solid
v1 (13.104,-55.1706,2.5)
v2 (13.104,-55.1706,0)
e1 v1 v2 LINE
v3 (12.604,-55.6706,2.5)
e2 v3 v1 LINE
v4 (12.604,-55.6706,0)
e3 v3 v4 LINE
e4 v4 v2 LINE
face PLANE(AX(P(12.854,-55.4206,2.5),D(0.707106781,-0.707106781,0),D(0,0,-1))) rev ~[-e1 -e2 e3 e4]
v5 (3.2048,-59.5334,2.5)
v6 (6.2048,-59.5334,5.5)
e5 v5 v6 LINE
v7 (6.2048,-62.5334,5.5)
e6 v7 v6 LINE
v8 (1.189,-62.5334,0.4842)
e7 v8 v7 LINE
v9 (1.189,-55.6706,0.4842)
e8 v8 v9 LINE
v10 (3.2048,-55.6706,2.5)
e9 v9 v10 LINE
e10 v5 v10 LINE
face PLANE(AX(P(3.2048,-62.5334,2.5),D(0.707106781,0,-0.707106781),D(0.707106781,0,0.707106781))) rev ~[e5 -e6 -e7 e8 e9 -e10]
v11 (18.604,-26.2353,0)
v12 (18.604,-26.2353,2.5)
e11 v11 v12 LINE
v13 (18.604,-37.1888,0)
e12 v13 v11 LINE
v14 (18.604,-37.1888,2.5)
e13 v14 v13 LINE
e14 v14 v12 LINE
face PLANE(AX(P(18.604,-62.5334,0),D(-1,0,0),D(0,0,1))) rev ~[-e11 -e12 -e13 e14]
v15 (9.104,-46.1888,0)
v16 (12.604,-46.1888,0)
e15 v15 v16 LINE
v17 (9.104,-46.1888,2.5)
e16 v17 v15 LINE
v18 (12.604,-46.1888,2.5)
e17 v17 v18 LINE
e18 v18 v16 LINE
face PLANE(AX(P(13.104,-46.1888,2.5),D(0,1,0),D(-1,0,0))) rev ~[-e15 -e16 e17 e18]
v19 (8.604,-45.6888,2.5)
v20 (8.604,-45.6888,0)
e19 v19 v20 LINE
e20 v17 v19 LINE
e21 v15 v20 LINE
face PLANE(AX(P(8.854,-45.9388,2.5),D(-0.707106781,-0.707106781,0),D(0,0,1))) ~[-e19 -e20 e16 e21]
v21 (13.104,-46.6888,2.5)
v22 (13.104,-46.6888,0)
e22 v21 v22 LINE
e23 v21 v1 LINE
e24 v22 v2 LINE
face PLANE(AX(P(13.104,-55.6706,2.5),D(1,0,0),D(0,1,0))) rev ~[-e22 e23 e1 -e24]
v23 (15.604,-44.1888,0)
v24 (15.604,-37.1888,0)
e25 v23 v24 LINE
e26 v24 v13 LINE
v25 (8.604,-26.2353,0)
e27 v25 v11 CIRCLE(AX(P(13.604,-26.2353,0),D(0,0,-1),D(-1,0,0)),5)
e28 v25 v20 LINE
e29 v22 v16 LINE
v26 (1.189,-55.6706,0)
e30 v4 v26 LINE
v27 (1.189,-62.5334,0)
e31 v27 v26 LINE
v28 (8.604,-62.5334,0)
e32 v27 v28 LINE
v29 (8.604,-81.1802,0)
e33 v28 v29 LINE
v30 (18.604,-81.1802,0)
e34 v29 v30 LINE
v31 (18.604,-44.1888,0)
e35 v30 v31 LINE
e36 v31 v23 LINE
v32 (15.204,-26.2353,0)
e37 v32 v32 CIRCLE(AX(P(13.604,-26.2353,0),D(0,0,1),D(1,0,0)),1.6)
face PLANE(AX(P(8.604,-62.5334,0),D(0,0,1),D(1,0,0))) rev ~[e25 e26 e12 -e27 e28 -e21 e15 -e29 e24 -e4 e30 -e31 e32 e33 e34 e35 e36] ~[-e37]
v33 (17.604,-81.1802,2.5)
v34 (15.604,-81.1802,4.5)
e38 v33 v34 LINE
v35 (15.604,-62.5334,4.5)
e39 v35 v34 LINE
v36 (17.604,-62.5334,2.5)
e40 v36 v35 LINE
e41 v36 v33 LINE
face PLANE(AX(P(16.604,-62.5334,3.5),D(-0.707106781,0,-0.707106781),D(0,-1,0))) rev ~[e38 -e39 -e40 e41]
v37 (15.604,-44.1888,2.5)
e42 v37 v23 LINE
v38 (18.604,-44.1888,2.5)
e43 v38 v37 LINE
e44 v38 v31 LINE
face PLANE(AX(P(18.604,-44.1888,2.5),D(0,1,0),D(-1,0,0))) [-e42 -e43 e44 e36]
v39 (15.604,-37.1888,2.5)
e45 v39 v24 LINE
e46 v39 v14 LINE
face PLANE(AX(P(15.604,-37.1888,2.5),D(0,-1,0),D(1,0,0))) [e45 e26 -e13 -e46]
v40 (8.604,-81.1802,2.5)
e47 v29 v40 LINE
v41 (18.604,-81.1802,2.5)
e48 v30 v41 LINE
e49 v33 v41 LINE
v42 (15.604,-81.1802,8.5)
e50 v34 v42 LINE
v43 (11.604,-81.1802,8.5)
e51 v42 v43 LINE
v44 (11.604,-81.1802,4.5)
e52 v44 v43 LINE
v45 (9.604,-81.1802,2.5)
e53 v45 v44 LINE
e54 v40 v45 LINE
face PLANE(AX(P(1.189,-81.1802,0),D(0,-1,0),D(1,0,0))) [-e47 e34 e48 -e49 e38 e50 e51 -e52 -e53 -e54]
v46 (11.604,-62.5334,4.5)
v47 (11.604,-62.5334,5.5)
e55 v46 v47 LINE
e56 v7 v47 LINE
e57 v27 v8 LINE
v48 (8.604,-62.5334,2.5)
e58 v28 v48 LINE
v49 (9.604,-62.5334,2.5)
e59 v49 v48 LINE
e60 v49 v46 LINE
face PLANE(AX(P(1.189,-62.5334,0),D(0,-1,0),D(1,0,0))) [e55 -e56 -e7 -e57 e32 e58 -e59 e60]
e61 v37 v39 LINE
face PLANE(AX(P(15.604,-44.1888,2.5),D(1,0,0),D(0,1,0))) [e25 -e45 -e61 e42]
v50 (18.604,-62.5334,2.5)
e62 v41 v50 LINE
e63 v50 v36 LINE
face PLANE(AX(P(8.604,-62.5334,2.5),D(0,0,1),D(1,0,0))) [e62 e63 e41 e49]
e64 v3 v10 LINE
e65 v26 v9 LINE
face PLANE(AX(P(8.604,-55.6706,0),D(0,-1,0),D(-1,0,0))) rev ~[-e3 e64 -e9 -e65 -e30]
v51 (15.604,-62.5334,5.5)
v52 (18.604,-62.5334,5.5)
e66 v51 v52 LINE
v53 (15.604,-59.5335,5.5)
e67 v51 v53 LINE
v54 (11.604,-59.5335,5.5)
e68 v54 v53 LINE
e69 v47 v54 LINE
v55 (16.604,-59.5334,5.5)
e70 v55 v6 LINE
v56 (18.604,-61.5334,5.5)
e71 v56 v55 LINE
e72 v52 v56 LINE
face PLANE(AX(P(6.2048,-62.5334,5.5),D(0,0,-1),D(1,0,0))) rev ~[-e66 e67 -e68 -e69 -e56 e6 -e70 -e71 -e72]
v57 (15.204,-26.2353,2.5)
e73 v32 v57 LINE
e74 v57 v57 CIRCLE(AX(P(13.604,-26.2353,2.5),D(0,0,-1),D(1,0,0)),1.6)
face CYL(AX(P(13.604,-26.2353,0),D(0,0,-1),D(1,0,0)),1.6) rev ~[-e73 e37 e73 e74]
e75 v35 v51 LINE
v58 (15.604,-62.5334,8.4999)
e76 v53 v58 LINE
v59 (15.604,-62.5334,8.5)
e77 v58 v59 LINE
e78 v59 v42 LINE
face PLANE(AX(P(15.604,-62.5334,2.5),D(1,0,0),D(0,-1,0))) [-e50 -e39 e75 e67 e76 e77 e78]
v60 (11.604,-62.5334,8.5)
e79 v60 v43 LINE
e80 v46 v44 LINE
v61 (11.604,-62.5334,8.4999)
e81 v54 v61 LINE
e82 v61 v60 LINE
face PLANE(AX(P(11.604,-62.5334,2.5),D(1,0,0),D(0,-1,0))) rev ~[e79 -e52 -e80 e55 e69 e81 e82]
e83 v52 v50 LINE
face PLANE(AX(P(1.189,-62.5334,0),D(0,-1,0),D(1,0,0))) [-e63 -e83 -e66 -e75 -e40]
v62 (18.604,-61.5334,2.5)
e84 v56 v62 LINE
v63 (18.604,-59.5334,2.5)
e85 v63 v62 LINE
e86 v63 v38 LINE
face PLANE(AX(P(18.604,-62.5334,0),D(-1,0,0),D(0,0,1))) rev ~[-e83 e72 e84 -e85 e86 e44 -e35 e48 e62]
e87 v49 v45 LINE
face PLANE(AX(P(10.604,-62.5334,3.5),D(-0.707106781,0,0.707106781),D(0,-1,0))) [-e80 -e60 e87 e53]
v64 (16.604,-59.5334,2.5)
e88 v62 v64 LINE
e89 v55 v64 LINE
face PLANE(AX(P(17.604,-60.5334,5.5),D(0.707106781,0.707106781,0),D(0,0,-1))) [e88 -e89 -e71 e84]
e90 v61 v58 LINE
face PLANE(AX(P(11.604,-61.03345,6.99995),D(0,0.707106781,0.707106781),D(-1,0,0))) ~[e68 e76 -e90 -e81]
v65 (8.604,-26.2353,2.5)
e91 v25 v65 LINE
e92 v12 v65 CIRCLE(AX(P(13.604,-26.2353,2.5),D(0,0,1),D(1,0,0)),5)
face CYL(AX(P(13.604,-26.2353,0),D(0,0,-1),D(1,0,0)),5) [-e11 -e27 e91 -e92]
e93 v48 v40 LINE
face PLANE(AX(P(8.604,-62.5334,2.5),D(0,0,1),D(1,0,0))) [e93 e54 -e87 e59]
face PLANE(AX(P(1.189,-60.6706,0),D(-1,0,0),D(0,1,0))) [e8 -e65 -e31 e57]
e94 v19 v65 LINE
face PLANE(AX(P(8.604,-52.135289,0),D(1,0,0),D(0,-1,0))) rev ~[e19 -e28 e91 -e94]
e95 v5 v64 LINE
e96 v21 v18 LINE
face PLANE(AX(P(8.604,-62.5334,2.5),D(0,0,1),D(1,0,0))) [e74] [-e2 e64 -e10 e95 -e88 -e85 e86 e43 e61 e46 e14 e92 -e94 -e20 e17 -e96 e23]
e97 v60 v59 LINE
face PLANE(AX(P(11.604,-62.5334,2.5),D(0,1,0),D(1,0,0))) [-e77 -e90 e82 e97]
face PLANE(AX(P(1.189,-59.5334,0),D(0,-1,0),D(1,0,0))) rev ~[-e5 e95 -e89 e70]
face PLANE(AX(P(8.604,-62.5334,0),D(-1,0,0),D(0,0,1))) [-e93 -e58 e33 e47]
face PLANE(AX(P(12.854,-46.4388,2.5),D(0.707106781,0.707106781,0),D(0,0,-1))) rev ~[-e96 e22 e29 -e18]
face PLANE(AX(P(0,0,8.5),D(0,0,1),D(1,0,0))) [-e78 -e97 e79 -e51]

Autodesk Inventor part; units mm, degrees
ref_plane "YZ Plane" through (0, 0, 0) normal (1, 0, 0) x (0, 1, 0)
ref_plane "XZ Plane" through (0, 0, 0) normal (0, 1, 0) x (-1, 0, 0)
sketch "Sketch1" plane through (0, 0, 0) normal (0, 0, 1) x (1, 0, 0)
  line L0 (8.404, 3) -> (8.404, -46.6888) projected
  line L1 (6.389, 0.2) -> (6.389, -55.1706) projected
  line L2 (7.404, -64.4706) -> (6.389, -64.4706) projected
  line L3 (6.389, -64.4706) -> (6.389, -78.3802) projected
  line L4 (-3.1786, -78.3802) -> (6.389, -78.3802) projected
  line L5 (-3.1786, -78.3802) -> (-3.1786, -81.1802) projected
  line L6 (8.404, -81.1802) -> (-3.1786, -81.1802) projected
  line L7 (8.404, -65.4706) -> (8.404, -81.1802) projected
  line L8 (8.604, -55.6706) -> (6.189, -55.6706)
  line L9 (6.189, -55.6706) -> (6.189, 0)
  line L10 (6.189, 0) -> (-3.3786, 0)
  line L11 (-3.3786, 0) -> (-3.3786, 3.2)
  line L12 (-3.3786, 3.2) -> (8.604, 3.2)
  line L13 (8.604, 3.2) -> (8.604, -55.6706)
  line L14 (8.604, -81.3802) -> (-3.3786, -81.3802)
  line L15 (-3.3786, -81.3802) -> (-3.3786, -78.1802)
  line L16 (-3.3786, -78.1802) -> (6.189, -78.1802)
  line L17 (6.189, -78.1802) -> (6.189, -64.2706)
  line L18 (6.189, -64.2706) -> (8.604, -64.2706)
  line L19 (8.604, -64.2706) -> (8.604, -81.3802)
  line L20 (13.604, -60.6706) -> (1.189, -60.6706)
  line L21 (1.189, -60.6706) -> (1.189, -5)
  line L22 (1.189, -5) -> (-8.3786, -5)
  line L23 (-8.3786, -5) -> (-8.3786, 8.2)
  line L24 (-8.3786, 8.2) -> (13.604, 8.2)
  line L25 (13.604, 8.2) -> (13.604, -60.6706)
  circle A0 centre (13.604, -26.2353) radius 5
  line L26 (18.604, -65.6706) -> (-3.811, -65.6706)
  line L27 (-3.811, -65.6706) -> (-3.811, -10)
  line L28 (-3.811, -10) -> (-13.3786, -10)
  line L29 (-13.3786, -10) -> (-13.3786, 13.2)
  line L30 (-13.3786, 13.2) -> (18.604, 13.2)
  line L31 (18.604, 13.2) -> (18.604, -65.6706)
  circle A1 centre (13.604, -26.2353) radius 1.6
  circle A2 centre (13.604, -26.2353) radius 30.3549
  circle A3 centre (13.604, -26.2353) radius 38.3626
  line L32 (8.604, -55.6706) -> (8.604, -56.1756)
  line L33 (6.189, -64.2706) -> (6.189, -63.8744)
  line L34 (6.189, -63.8744) -> (18.604, -63.8744)
  line L35 (6.189, -63.8744) -> (18.604, -63.8744) construction
  line L36 (8.604, -55.6706) -> (1.189, -55.6706)
  line L37 (1.189, -55.6706) -> (1.189, -63.8744)
  line L38 (1.189, -63.8744) -> (18.604, -63.8744)
  line L39 (1.189, -62.5334) -> (18.604, -62.5334)
  line L40 (1.189, -62.5334) -> (18.604, -62.5334) construction
  line L41 (6.389, -55.1706) -> (12.3969, -55.1706) projected
  line L42 (12.604, -54.9635) -> (12.3969, -55.1706) projected
  line L43 (12.604, -46.8959) -> (12.604, -54.9635) projected
  line L44 (12.3969, -46.6888) -> (12.604, -46.8959) projected
  line L45 (8.404, -46.6888) -> (12.3969, -46.6888) projected
  line L46 (-3.1786, 3) -> (8.404, 3) projected
  line L47 (-3.1786, 0.2) -> (-3.1786, 3) projected
  line L48 (-3.1786, 0.2) -> (6.389, 0.2) projected
  circle A4 centre (9.4965, -50.9297) radius 1.5 projected
  line L49 (7.404, -64.4706) -> (8.404, -65.4706) projected
  point P0 (0, 0)
  point P1 (8.604, -26.2353)
  point P2 (18.604, -26.2353)
  dimension "d0" = 0.2
  dimension "d1" = 0.2
  dimension "d2" = 5
  dimension "d3" = 5
  dimension "d4" = 3.2
  dimension "d5" = 0
  dimension "d6" = 0
extrude "Extrusion1" add sketch "Sketch1" along normal blind 2.5 contours L45 L44 L43 L42 L41 L13 A4 | L13 A0 L25 A2 L32 L41 L42 L43 L44 L45 | A0 L25 A1 | A4 L13 | A0 L25 A1 | A0 L31 A2 L25 | A2 L31 L39 L37 L20 L25 | L25 L20 L21 L36 A2 | L8 L32 A2 picked at (9.3865, -50.8083) picked at (16.7555, -47.8971)
sketch "Sketch2" plane through (1.189, -62.5334, 0) normal (0, -1, 0) x (1, 0, 0)
  line L0 (-0.8528, -0.0858) -> (2.6827, 3.4497) projected
  line L1 (-0.7114, -0.2272) -> (2.8241, 3.3083)
  line L2 (0, 2.5) -> (17.415, 2.5) projected
  line L3 (0, 0) -> (0, 2.5) projected
  point P0 (-1.189, 0)
  point P1 (0, 0.4842)
  point P2 (2.0158, 2.5)
  dimension "d9" = 0.2
extrude "Extrusion2" cut sketch "Sketch2" against normal through all
sketch "Sketch4" plane through (1.189, -62.5334, 0) normal (0, -1, 0) x (1, 0, 0)
  line L0 (2.0158, 2.5) -> (17.415, 2.5) projected
  line L1 (0, 0) -> (17.415, 0) projected
  line L2 (17.415, 0) -> (17.415, 2.5) projected
  line L3 (7.415, 0) -> (7.415, 2.5) projected
  point P0 (-1.189, 0)
ref_plane "Work Plane1" through (-8.1491, -81.1802, -17.0906) normal (0, -1, 0) x (0.7071068, 0, 0.7071068)
extrude "Extrusion3" add sketch "Sketch4" along normal up to surface (18.6468 mm away)
sketch "Sketch5" plane through (0, 0, 2.5) normal (0, 0, 1) x (1, 0, 0)
  line L0 (8.604, -26.2353) -> (8.604, -55.6706) projected
  circle A0 centre (13.604, -26.2353) radius 1.6 projected
  circle A1 centre (13.604, -26.2353) radius 29.857
  line L1 (8.604, -26.2353) -> (8.604, -55.6706) projected
  line L2 (8.604, -55.6706) -> (12.604, -55.6706)
  line L3 (8.604, -55.6706) -> (12.604, -55.6706) construction
  line L4 (12.604, -55.6706) -> (8.604, -55.6706)
  line L5 (8.604, -55.6706) -> (8.604, -51.6706)
  line L6 (8.604, -51.6706) -> (12.604, -51.6706)
  line L7 (12.604, -51.6706) -> (12.604, -55.6706)
  line L8 (12.604, -51.6706) -> (8.604, -51.6706)
  line L9 (8.604, -51.6706) -> (8.604, -47.6706)
  line L10 (8.604, -47.6706) -> (12.604, -47.6706)
  line L11 (12.604, -47.6706) -> (12.604, -51.6706)
  line L12 (12.604, -47.6706) -> (8.604, -47.6706)
  line L13 (8.604, -47.6706) -> (8.604, -46.6706)
  line L14 (8.604, -46.6706) -> (12.604, -46.6706)
  line L15 (12.604, -46.6706) -> (12.604, -47.6706)
  circle A2 centre (13.604, -26.2353) radius 20.4598
  circle A3 centre (13.604, -26.2353) radius 19.9598
  line L16 (12.604, -55.6706) -> (13.104, -55.6706)
  line L17 (13.104, -55.6706) -> (13.104, -46.1888)
  line L18 (13.104, -46.1888) -> (8.604, -46.1888)
  point P0 (0, 0)
  dimension "d22" = 0.5
  dimension "d14" = 4
  dimension "d15" = 0
  dimension "d16" = 4
  dimension "d17" = 4
  dimension "d18" = 4
  dimension "d19" = 4
  dimension "d20" = 4
  dimension "d21" = 1
  dimension "d23" = 0.5
  dimension "d24" = 90
  dimension "d25" = 90
extrude "Extrusion4" cut sketch "Sketch5" against normal blind 10 contours L18 A2 L14 L0 | L14 L15 L10 L0 | L18 L17 A2 | L10 L11 L6 L0 | A2 L17 L16 L7 L11 L15 | L6 L7 L2 L0
chamfer "Chamfer1" distance 0.5 angle 45 3 edges at (8.604, -46.1888, 1.25) (13.104, -46.1888, 1.25) (13.104, -55.6706, 1.25)
sketch "Sketch6" plane through (0, 0, 2.5) normal (0, 0, 1) x (1, 0, 0)
  line L0 (18.604, -26.2353) -> (18.604, -81.1802) projected
  line L1 (8.604, -62.5334) -> (8.604, -81.1802) projected
  line L2 (15.604, -26.2353) -> (15.604, -81.1802)
  line L3 (11.604, -62.5334) -> (11.604, -81.1802)
  line L4 (11.604, -62.5334) -> (15.604, -62.5334)
  line L5 (15.604, -62.5334) -> (15.604, -81.1802)
  line L6 (15.604, -81.1802) -> (11.604, -81.1802)
  line L7 (11.604, -81.1802) -> (11.604, -62.5334)
  point P0 (0, 0)
  dimension "d31" = 3
  dimension "d32" = 3
extrude "Extrusion5" add sketch "Sketch6" along normal blind 6
chamfer "Chamfer2" distance 2 angle 45 2 edges at (11.604, -71.8568, 2.5) (15.604, -71.8568, 2.5)
sketch "Sketch7" plane through (0, 0, 2.5) normal (0, 0, 1) x (1, 0, 0)
  line L0 (18.604, -26.2353) -> (18.604, -81.1802) projected
  line L1 (9.104, -46.1888) -> (12.604, -46.1888) projected
  line L2 (9.104, -44.1888) -> (12.604, -44.1888)
  line L3 (18.604, -44.1888) -> (15.604, -44.1888)
  line L4 (15.604, -44.1888) -> (15.604, -37.1888)
  line L5 (15.604, -37.1888) -> (18.604, -37.1888)
  line L6 (18.604, -37.1888) -> (18.604, -44.1888)
  point P0 (0, 0)
  dimension "d38" = 2
  dimension "d39" = 3
  dimension "d40" = 7
extrude "Extrusion6" cut sketch "Sketch7" against normal blind 6
sketch "Sketch9" plane through (1.189, -62.5334, 0) normal (0, -1, 0) x (1, 0, 0)
  line L0 (2.0158, 2.5) -> (7.415, 2.5) projected
  line L1 (2.0158, 2.5) -> (0, 0.4842) projected
  line L2 (7.415, 0) -> (7.415, 2.5) projected
  line L3 (7.415, 2.5) -> (7.415, 5.5)
  line L4 (7.415, 2.5) -> (10.415, 2.5) construction
  line L5 (0, 0.4842) -> (5.0158, 5.5)
  line L6 (17.415, 2.5) -> (17.415, 0) projected
  line L7 (5.0158, 5.5) -> (17.415, 5.5)
  line L8 (5.0158, 5.5) -> (17.415, 5.5) construction
  line L9 (17.415, 5.5) -> (17.415, 2.5)
  line L10 (17.415, 2.5) -> (7.415, 2.5)
  point P0 (-1.189, 0)
  dimension "d43" = 3
  dimension "d44" = 90
  dimension "d45" = 0
extrude "Extrusion7" add sketch "Sketch9" against normal blind 3
chamfer "Chamfer3" distance 2 angle 45 1 edges at (18.604, -59.5334, 4)
chamfer "Chamfer4" distance 3 angle 45 1 edges at (13.604, -62.5334, 5.5)
properties part number "LatchLock_3DPrint"
